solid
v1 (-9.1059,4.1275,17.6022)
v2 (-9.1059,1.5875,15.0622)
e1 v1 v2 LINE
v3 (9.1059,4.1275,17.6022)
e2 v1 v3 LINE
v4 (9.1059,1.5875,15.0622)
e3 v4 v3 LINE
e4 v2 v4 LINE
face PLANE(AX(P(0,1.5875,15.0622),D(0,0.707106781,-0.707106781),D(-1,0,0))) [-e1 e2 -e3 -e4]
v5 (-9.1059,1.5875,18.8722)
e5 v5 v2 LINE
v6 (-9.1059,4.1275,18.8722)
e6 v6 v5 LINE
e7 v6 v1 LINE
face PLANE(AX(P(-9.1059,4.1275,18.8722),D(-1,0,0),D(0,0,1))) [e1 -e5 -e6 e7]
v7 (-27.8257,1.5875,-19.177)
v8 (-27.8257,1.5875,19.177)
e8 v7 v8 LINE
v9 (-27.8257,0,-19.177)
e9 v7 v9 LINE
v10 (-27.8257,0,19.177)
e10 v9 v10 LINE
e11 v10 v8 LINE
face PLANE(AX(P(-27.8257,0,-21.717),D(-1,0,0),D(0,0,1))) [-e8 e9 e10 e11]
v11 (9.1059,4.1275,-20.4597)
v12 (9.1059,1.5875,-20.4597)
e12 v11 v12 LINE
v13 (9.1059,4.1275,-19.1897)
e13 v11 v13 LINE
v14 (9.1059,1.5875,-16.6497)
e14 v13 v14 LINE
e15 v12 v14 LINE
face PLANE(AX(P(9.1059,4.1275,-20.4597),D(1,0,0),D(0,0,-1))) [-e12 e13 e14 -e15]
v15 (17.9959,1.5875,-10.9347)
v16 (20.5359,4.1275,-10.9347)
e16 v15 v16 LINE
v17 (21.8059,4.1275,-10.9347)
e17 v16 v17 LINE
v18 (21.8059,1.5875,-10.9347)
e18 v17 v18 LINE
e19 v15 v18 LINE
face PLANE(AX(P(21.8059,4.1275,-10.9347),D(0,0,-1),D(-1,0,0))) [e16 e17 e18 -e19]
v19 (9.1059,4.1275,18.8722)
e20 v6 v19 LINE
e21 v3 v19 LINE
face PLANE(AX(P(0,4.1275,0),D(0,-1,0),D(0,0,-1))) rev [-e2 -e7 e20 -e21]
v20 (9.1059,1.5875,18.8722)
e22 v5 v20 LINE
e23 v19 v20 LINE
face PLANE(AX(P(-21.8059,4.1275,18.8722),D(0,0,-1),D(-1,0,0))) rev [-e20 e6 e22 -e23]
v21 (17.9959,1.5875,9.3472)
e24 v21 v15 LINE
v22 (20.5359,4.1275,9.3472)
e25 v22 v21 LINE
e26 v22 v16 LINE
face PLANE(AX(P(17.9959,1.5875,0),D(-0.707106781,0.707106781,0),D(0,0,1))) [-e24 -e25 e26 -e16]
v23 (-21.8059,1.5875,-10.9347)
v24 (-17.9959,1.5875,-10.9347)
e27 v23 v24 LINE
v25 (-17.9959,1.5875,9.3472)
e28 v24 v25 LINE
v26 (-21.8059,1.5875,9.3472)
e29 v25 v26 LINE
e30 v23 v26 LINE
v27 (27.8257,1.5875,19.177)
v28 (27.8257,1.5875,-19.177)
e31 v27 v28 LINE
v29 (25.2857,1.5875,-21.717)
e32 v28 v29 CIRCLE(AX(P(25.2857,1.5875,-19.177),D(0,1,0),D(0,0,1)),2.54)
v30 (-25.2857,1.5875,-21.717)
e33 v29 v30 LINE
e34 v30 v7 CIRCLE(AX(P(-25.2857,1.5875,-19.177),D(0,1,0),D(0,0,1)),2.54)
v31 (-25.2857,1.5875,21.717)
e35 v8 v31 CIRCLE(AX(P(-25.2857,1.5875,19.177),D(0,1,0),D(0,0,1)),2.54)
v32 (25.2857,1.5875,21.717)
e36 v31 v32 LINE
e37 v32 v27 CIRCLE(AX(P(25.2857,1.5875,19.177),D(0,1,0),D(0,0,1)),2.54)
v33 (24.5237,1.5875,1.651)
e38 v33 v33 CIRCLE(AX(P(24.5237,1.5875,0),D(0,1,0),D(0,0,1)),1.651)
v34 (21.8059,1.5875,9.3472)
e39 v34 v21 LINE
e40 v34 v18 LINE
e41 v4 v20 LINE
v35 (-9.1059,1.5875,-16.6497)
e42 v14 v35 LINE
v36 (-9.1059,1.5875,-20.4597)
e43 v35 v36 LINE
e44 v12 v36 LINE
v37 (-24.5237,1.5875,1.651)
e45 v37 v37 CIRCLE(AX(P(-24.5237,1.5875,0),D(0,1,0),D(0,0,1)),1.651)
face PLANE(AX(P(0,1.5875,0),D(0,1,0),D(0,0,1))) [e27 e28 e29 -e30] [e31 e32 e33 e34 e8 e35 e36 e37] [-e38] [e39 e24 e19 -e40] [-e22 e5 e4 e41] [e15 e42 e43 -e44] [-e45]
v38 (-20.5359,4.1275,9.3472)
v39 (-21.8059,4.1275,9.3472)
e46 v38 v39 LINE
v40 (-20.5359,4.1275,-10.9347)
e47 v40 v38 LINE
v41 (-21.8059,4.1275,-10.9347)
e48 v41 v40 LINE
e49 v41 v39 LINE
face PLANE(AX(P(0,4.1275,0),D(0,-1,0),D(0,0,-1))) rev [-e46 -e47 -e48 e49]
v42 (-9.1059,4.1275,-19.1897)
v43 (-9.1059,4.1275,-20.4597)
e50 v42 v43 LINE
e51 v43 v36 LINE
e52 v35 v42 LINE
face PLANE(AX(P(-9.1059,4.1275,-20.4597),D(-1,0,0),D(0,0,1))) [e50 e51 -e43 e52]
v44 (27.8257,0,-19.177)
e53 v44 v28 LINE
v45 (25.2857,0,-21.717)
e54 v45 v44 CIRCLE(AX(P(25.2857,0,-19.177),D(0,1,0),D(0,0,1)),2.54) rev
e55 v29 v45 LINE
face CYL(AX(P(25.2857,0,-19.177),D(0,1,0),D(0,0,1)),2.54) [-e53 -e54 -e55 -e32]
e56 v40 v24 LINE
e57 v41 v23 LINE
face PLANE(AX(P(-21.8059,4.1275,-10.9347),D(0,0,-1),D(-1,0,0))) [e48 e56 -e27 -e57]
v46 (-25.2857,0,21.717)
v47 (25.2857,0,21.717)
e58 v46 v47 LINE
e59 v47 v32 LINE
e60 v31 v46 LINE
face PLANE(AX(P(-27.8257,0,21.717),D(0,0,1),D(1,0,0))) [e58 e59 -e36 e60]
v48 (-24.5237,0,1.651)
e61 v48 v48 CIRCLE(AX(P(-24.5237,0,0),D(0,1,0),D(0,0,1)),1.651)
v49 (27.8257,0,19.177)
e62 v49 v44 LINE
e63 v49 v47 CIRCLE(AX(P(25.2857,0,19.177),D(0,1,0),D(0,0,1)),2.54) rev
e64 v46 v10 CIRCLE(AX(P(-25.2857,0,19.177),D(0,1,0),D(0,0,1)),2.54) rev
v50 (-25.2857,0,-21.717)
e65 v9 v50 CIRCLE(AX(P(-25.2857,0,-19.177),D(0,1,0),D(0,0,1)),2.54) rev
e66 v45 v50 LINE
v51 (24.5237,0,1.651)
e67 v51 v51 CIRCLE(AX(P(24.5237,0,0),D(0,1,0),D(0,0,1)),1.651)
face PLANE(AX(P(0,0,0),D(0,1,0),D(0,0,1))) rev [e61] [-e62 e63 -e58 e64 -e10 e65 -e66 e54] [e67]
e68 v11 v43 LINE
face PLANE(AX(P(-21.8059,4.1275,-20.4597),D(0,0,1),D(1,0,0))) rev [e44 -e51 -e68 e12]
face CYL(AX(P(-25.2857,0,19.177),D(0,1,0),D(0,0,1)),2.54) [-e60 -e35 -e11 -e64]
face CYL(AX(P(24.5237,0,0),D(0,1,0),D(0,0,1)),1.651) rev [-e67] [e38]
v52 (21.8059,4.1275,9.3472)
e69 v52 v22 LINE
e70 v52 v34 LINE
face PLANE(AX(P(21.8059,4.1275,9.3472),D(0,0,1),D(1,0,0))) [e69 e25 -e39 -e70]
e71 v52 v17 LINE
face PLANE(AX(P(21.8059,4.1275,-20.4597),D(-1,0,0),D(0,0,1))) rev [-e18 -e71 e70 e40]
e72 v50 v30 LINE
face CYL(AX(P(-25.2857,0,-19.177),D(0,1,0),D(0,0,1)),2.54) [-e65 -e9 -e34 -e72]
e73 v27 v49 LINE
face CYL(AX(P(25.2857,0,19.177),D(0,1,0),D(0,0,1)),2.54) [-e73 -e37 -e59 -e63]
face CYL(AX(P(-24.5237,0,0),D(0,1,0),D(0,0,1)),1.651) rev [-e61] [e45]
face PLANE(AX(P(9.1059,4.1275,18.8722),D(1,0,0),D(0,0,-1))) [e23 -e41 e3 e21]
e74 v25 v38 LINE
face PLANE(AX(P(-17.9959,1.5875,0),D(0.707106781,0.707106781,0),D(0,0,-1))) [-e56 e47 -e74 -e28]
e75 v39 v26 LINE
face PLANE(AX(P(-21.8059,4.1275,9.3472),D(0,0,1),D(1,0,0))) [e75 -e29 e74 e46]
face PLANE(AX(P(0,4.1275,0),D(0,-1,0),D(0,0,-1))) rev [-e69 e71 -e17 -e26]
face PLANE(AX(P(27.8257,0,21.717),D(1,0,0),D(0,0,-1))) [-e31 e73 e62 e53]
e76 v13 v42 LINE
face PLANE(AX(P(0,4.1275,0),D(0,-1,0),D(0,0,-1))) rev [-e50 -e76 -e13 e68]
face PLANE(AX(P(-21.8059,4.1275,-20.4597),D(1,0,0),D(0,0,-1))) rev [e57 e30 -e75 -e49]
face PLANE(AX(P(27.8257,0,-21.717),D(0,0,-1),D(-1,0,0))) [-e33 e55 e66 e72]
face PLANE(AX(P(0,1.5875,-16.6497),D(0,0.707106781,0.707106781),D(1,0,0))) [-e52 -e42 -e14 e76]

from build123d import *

# Parameters (mm, degrees)
SKETCH1_W           = 56.6674
SKETCH1_H           = 44.45
BOSS_EXTRUDE1_DEPTH = 1.5875
SKETCH2_W           = 43.6118
SKETCH2_H           = 39.3319
SKETCH2_W_2         = 41.0718
SKETCH2_H_2         = 36.7919
BOSS_EXTRUDE2_DEPTH = 2.54
SKETCH3_R           = 1.651
CUT_EXTRUDE1_DEPTH  = 37.099872308
SKETCH4_W           = 56.6674
SKETCH4_H           = 44.45
SKETCH4_W_2         = 55.6514
SKETCH4_H_2         = 43.434
CUT_EXTRUDE2_DEPTH  = 37.099872308
FILLET1_R           = 2.54
SKETCH5_W           = 12.7
SKETCH5_H           = 9.525
CUT_EXTRUDE3_DEPTH  = 36.388547151
CHAMFER1_SIZE       = 2.54


with BuildPart() as part:
    # Sketch1 → Boss-Extrude1 (new body)
    with BuildSketch(Plane(origin=(0, 0, 0), x_dir=(1, 0, 0), z_dir=(0, 1, 0))):
        Rectangle(SKETCH1_W, SKETCH1_H)
    extrude(amount=BOSS_EXTRUDE1_DEPTH)

    # Sketch2 → Boss-Extrude2 (add)
    with BuildSketch(Plane(origin=(0, 1.5875, 0), x_dir=(1, 0, 0), z_dir=(0, 1, 0))):
        with Locations((0, 0.79375)):
            Rectangle(SKETCH2_W, SKETCH2_H)
        with Locations((0, 0.79375)):
            Rectangle(SKETCH2_W_2, SKETCH2_H_2, mode=Mode.SUBTRACT)
    extrude(amount=BOSS_EXTRUDE2_DEPTH)

    # Sketch3 → Cut-Extrude1 (cut, through all)
    with BuildSketch(Plane(origin=(0, 1.5875, 0), x_dir=(1, 0, 0), z_dir=(0, 1, 0))):
        with Locations(Location((-24.5237, 0, 0), (0, 0, 270))):
            Circle(SKETCH3_R)
        with Locations(Location((24.5237, 0, 0), (0, 0, 270))):
            Circle(SKETCH3_R)
    extrude(amount=-CUT_EXTRUDE1_DEPTH, mode=Mode.SUBTRACT)

    # Sketch4 → Cut-Extrude2 (cut, through all)
    with BuildSketch(Plane(origin=(0, 1.5875, 0), x_dir=(1, 0, 0), z_dir=(0, 1, 0))):
        Rectangle(SKETCH4_W, SKETCH4_H)
        Rectangle(SKETCH4_W_2, SKETCH4_H_2, mode=Mode.SUBTRACT)
    extrude(amount=-CUT_EXTRUDE2_DEPTH, mode=Mode.SUBTRACT)

    # Fillet1
    fillet1_edges = [part.edges().sort_by_distance(p)[0] for p in [
        (27.8257, 0.79375, 21.717),
        (-27.8257, 0.79375, 21.717),
        (-27.8257, 0.79375, -21.717),
        (27.8257, 0.79375, -21.717),
    ]]
    fillet(fillet1_edges, radius=FILLET1_R)

    # Sketch5 → Cut-Extrude3 (cut, through all)
    with BuildSketch(Plane(origin=(0, 1.5875, 0), x_dir=(1, 0, 0), z_dir=(0, 1, 0))):
        with Locations((-15.4559, 15.6972)):
            Rectangle(SKETCH5_W, SKETCH5_H)
        with Locations((-15.4559, -14.1097)):
            Rectangle(SKETCH5_W, SKETCH5_H)
        with Locations((15.4559, -14.1097)):
            Rectangle(SKETCH5_W, SKETCH5_H)
        with Locations((15.4559, 15.6972)):
            Rectangle(SKETCH5_W, SKETCH5_H)
    extrude(amount=CUT_EXTRUDE3_DEPTH, mode=Mode.SUBTRACT)

    # Chamfer1
    chamfer1_edges = [part.edges().sort_by_distance(p)[0] for p in [
        (0, 1.5875, 17.6022),
        (20.5359, 1.5875, -0.79375),
        (0, 1.5875, -19.1897),
        (-20.5359, 1.5875, -0.79375),
    ]]
    chamfer(chamfer1_edges, length=CHAMFER1_SIZE - 0.0001)  # a hair under: the kernel refuses the full size


solid = part.part
